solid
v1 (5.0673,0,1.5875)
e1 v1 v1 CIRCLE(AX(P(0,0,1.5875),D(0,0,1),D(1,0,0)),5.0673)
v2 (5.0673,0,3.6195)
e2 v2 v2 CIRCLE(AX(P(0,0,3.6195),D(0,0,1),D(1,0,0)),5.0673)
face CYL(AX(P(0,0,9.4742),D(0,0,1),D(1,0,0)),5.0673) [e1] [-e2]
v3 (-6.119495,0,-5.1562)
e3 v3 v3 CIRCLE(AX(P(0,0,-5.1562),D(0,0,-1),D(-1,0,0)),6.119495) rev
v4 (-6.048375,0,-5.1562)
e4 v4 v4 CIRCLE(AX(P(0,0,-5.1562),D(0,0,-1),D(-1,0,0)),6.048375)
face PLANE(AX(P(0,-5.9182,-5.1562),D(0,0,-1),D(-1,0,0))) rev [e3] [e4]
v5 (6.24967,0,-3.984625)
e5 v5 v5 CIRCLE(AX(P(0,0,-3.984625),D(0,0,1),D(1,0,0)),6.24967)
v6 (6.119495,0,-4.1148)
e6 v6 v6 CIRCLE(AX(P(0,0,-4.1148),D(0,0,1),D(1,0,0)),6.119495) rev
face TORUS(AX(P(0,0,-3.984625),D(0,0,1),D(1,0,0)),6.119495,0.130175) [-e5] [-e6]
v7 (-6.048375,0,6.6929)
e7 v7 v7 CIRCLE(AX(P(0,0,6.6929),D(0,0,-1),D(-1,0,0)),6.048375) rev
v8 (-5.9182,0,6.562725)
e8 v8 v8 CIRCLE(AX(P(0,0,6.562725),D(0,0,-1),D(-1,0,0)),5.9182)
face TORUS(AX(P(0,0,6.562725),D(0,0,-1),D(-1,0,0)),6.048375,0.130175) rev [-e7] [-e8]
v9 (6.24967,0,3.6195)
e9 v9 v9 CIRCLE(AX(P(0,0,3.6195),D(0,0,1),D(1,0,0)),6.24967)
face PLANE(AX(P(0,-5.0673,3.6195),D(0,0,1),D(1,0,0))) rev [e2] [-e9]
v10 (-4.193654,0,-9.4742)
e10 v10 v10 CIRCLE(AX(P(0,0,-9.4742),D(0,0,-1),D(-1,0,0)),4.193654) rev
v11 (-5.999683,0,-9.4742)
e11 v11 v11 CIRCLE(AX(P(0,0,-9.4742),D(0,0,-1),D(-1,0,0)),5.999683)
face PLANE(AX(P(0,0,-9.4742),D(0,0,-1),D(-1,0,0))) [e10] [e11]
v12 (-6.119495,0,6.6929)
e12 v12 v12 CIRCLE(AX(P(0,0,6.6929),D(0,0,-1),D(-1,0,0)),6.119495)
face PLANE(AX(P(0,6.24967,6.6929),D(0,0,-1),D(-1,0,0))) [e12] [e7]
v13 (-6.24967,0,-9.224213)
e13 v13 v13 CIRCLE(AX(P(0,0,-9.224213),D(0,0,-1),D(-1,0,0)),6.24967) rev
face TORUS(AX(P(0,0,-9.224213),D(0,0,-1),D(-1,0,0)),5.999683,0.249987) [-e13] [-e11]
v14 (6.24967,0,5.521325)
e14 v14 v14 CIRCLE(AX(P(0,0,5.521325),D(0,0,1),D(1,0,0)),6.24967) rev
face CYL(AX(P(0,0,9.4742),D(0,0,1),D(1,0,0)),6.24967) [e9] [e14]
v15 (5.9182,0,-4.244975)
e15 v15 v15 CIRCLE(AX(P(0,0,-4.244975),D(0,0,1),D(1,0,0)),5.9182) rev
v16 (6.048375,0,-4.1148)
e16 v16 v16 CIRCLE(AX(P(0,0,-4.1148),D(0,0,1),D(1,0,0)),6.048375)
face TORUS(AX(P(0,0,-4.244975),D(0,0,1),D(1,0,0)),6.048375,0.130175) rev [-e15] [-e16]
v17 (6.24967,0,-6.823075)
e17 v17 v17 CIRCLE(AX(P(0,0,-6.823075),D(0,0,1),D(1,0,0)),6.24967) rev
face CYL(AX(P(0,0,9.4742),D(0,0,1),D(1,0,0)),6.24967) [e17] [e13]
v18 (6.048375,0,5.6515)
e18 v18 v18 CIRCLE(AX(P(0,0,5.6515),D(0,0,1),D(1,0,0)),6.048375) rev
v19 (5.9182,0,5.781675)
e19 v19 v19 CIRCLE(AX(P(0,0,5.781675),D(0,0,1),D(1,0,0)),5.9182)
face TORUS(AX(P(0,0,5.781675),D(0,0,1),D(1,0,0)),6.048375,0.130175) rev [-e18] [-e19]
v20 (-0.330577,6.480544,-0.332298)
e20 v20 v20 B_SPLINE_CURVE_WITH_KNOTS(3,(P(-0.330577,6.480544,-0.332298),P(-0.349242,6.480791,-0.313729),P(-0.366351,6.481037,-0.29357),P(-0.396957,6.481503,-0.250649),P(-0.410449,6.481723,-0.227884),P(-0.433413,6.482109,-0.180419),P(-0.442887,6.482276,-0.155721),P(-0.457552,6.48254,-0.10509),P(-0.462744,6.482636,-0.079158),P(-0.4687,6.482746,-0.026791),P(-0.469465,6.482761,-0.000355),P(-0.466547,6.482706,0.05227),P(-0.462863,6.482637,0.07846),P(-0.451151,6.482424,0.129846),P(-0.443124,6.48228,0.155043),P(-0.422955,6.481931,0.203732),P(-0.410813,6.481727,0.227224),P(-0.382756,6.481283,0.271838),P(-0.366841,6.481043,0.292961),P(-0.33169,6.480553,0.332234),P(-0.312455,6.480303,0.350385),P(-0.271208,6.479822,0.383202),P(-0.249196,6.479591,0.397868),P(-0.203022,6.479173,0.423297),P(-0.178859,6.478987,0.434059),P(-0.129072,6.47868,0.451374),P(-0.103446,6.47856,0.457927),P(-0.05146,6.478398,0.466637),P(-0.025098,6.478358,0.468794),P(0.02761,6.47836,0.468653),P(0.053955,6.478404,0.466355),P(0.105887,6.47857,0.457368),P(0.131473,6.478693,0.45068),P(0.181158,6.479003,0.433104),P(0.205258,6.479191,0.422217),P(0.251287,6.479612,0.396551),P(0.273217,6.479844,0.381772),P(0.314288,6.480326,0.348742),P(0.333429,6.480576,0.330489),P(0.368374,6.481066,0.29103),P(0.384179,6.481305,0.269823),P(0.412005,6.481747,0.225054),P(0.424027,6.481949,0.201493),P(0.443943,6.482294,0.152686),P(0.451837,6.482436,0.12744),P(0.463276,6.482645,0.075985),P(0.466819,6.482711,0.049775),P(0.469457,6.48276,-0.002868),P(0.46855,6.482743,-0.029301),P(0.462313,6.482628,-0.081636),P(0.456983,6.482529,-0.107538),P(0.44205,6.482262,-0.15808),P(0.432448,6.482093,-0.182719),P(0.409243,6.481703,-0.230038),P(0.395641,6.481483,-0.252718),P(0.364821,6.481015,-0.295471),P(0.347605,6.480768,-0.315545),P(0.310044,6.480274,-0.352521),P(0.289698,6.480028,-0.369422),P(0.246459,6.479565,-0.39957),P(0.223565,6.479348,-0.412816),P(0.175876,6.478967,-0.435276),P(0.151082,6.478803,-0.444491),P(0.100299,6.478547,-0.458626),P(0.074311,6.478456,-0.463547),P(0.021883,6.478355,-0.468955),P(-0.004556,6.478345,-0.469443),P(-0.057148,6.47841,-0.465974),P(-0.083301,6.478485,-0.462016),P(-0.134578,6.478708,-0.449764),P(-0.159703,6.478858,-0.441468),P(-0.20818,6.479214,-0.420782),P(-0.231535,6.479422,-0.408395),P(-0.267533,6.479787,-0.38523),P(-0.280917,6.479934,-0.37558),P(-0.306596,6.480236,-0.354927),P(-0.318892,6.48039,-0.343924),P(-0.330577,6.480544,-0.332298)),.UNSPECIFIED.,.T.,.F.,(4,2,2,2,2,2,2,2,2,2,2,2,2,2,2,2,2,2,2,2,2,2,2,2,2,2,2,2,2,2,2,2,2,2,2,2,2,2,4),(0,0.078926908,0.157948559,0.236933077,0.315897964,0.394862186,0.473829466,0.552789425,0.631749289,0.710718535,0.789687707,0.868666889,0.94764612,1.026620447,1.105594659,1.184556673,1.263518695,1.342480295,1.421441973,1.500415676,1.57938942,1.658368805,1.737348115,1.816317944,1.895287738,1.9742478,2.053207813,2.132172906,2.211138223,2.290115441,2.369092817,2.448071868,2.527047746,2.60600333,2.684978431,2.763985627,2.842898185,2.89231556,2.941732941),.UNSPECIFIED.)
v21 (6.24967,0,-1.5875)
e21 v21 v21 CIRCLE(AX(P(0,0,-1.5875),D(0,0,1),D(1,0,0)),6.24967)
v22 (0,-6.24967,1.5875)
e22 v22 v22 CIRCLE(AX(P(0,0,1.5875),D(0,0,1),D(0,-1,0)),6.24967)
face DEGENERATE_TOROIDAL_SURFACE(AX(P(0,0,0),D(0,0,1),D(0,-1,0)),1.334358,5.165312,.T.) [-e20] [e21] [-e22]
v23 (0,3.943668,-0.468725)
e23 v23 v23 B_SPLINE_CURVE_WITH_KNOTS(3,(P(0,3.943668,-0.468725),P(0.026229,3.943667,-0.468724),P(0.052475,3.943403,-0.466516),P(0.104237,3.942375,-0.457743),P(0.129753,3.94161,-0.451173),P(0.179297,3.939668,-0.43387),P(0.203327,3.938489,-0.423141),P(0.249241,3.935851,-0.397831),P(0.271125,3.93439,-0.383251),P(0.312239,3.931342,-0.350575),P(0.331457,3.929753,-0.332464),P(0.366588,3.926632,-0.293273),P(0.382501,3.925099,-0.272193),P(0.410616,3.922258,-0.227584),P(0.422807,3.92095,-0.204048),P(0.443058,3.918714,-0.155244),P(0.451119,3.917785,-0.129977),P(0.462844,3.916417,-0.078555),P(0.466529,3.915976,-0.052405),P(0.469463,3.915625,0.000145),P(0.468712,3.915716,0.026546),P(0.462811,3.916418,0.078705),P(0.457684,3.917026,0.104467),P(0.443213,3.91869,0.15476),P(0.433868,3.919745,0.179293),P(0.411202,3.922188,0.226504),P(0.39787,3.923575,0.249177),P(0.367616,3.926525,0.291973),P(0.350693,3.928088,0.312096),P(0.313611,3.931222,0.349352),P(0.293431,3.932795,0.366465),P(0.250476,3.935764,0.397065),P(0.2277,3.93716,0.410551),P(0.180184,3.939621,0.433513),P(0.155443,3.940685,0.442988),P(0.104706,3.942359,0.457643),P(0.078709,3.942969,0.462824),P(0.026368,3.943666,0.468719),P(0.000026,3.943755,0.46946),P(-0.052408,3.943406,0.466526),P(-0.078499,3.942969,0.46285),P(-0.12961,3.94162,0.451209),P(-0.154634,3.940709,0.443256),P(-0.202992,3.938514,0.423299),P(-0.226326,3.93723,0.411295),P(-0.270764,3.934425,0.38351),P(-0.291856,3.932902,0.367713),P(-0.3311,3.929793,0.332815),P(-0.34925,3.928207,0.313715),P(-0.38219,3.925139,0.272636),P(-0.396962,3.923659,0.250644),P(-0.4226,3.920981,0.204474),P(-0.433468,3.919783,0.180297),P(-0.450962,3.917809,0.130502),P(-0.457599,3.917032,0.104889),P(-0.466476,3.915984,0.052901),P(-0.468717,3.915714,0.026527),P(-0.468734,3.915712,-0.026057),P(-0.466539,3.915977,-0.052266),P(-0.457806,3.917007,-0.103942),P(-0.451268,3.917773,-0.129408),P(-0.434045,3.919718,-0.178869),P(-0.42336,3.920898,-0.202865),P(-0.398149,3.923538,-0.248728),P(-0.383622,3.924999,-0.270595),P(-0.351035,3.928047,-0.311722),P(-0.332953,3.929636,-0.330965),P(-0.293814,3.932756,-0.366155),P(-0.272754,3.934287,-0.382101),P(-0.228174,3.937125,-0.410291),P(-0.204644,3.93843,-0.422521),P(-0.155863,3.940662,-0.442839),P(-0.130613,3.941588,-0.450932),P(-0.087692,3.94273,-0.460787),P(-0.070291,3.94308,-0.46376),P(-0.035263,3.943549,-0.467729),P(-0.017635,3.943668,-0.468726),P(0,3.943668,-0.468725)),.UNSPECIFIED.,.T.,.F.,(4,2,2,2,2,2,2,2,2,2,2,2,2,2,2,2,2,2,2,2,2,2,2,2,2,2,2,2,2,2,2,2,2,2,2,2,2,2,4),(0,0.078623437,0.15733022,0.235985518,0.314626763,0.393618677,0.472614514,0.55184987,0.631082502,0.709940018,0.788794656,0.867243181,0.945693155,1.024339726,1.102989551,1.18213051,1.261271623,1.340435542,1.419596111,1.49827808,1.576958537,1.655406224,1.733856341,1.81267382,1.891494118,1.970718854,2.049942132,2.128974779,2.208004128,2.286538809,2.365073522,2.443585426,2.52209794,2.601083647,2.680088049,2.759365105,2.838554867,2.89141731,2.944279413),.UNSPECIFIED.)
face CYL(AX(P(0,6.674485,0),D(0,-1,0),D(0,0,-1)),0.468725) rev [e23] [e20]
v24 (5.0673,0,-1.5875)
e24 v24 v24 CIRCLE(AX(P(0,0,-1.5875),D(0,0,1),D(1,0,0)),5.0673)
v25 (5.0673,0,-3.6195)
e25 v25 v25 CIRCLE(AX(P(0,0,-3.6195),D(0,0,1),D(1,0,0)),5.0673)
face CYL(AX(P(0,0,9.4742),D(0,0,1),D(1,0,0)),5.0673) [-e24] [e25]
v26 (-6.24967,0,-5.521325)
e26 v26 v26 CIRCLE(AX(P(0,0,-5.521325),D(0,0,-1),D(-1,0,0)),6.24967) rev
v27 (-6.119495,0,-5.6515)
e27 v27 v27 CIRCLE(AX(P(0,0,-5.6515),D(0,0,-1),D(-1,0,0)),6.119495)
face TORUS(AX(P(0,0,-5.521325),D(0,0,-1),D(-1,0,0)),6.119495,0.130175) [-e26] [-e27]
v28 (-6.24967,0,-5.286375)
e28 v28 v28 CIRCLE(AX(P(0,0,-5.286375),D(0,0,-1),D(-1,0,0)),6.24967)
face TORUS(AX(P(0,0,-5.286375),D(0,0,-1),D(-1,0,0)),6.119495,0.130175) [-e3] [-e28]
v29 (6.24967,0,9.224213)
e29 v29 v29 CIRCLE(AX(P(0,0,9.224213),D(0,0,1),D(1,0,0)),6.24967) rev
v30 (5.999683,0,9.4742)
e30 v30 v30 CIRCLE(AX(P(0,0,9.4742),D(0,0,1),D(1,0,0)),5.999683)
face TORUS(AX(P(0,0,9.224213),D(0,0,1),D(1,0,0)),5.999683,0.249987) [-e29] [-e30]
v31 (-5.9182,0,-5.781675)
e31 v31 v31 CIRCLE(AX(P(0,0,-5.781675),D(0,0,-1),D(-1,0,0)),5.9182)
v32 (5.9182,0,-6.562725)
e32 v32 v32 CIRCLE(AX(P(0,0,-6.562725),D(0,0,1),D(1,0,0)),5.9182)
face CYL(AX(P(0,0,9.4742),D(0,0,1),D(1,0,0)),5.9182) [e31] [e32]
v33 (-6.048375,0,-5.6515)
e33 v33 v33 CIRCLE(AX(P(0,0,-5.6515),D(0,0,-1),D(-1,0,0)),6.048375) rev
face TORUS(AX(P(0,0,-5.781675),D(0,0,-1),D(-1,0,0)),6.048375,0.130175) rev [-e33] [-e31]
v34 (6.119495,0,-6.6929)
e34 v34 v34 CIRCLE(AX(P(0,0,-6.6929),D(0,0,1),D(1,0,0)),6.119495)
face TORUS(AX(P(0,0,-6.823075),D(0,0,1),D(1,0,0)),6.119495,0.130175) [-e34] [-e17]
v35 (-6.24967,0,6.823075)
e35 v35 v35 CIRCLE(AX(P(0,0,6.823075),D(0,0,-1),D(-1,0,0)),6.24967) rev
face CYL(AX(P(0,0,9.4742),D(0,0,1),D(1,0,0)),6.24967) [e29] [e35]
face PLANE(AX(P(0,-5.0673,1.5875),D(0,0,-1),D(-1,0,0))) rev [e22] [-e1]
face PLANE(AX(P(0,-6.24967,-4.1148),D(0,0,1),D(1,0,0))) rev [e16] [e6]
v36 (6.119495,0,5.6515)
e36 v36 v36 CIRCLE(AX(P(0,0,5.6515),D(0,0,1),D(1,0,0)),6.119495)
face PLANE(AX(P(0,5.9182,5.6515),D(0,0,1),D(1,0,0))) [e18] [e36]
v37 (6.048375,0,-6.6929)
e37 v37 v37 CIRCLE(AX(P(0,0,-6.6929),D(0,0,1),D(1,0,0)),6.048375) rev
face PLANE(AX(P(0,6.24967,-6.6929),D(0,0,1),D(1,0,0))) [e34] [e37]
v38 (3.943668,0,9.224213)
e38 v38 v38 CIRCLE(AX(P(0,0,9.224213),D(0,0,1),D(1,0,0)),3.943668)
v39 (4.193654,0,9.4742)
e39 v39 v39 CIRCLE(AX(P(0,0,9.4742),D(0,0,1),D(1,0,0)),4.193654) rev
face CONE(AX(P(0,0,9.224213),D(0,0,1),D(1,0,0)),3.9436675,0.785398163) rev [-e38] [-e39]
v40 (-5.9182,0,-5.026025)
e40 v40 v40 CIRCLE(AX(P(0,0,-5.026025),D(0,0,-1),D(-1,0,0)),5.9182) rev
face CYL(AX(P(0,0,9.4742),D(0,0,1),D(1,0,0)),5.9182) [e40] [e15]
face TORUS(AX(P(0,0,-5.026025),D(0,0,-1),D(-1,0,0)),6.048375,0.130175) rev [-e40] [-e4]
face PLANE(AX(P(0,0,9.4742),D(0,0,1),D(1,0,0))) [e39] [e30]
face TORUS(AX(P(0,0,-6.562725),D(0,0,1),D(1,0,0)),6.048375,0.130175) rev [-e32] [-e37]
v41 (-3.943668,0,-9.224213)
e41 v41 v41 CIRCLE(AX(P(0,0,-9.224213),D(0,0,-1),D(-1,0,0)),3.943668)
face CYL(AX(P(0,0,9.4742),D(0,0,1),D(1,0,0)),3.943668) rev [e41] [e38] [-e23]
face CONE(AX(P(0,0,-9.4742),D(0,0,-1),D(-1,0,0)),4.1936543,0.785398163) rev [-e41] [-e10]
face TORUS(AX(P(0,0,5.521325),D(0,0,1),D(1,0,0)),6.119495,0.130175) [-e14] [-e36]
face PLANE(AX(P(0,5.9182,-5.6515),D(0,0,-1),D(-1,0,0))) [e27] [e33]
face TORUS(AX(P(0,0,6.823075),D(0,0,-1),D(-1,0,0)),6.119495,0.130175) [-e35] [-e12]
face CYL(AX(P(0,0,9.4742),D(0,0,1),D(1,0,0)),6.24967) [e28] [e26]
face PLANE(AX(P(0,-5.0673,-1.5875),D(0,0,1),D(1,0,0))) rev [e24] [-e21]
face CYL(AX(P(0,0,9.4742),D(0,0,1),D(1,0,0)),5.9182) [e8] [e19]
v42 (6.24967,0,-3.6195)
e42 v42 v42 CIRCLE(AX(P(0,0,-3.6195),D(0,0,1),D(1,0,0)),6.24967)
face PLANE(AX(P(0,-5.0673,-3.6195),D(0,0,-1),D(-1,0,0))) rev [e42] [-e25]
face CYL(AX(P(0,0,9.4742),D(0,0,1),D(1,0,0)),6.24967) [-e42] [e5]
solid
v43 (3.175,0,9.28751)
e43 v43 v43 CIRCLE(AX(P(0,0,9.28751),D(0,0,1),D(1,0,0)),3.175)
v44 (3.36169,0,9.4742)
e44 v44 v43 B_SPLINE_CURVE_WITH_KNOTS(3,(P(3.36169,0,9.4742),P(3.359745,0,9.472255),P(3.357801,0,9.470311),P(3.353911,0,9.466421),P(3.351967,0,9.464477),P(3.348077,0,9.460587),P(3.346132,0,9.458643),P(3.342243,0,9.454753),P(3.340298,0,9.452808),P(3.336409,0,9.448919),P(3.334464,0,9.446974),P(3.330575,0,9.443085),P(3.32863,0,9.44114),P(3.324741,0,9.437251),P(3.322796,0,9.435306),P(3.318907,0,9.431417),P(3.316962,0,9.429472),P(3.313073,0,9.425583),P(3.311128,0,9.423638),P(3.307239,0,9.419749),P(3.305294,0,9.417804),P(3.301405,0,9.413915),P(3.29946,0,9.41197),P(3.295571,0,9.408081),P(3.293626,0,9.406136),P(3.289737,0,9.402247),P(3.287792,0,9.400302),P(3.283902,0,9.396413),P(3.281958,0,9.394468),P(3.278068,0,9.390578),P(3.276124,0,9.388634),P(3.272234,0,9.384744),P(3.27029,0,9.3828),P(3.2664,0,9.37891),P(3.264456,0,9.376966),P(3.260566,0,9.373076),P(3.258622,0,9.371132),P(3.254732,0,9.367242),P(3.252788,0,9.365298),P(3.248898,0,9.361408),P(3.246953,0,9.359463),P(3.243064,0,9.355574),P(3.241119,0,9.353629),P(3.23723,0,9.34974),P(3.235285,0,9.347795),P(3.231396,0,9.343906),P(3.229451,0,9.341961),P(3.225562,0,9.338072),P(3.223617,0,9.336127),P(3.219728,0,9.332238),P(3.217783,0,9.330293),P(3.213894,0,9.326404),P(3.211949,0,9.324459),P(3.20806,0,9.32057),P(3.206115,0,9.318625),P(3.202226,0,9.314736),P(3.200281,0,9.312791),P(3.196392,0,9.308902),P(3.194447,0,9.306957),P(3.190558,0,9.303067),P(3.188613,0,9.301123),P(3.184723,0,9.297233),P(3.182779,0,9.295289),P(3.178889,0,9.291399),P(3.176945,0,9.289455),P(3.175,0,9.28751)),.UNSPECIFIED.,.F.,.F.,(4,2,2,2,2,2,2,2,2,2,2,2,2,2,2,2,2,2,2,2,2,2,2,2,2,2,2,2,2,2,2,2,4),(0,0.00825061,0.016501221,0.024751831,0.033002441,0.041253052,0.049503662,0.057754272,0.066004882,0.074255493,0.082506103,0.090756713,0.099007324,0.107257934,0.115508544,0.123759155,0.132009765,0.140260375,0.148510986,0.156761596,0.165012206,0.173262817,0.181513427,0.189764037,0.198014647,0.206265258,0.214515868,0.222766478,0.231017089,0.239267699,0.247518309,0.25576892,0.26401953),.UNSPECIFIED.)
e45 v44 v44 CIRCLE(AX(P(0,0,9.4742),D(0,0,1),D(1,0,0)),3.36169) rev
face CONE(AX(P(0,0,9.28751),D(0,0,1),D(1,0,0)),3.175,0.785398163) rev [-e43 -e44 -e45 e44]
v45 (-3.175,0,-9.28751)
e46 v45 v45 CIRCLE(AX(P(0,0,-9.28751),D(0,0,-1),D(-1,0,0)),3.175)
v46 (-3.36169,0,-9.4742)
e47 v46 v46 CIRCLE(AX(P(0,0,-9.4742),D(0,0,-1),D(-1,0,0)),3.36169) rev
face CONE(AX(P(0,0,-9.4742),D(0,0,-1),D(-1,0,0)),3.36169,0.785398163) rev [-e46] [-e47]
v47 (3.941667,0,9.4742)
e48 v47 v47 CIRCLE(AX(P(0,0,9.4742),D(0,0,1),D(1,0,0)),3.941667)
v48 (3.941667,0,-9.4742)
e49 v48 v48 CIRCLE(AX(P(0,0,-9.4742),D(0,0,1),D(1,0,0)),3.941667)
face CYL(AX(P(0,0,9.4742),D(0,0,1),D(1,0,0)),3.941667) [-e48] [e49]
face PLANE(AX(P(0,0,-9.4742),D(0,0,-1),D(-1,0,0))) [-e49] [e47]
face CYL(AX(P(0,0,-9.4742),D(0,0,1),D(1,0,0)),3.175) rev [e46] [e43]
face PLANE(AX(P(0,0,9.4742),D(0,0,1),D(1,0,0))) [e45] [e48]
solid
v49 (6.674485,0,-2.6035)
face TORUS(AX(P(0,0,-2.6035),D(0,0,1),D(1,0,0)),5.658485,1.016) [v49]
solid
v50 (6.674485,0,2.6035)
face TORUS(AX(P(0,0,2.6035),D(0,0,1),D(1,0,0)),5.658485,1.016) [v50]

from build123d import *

# Parameters (mm, degrees)
BORE_DEPTH                      = 13.95674403
BORE_DEPTH_BACK                 = 13.95674403
SKETCH16_R                      = 3.175
CUT_REVOLVE_THIN1_START         = -9.4742
CUT_REVOLVE_THIN1_OUTLINE_R     = 3.9436675
CUT_REVOLVE_THIN1_OUTLINE_R_2   = 3.175
CUT_REVOLVE_THIN1_DEPTH         = 18.9484
CUT_REVOLVE_THIN1_2_OUTLINE_R   = 3.9416675
CUT_REVOLVE_THIN1_2_OUTLINE_R_2 = 3.175
CUT_REVOLVE_THIN1_2_DEPTH       = 18.9484
SKETCH11_W                      = 2.032
SKETCH11_H                      = 1.18237
SKETCH17_W                      = 1.0414
SKETCH17_H                      = 0.33147
SKETCH14_R                      = 1.016
SKETCH12_R                      = 0.46872525
CUT_EXTRUDE3_DEPTH              = 14.373779135
FILLET1_R                       = 0.2499868
FILLET2_R                       = 0.130175
CHAMFER1_SIZE                   = 0.2499868
CHAMFER2_SIZE                   = 0.18669


with BuildPart() as part:
    # Sketch15 → Bearing (revolve)
    with BuildSketch(Plane(origin=(0, 0, 0), x_dir=(0, 0, -1), z_dir=(1, 0, 0)), mode=Mode.PRIVATE) as bearing_sk:
        Polygon((-9.4742, 0), (9.4742, 0), (9.4742, -6.24967), (6.6929, -6.24967), (6.6929, -5.9182), (5.6515, -5.9182), (5.6515, -6.24967), (-5.6515, -6.24967), (-5.6515, -5.9182), (-6.6929, -5.9182), (-6.6929, -6.24967), (-9.4742, -6.24967), align=None)
    revolve(bearing_sk.sketch.rotate(Axis((0, 0, 9.4742), (0, 0, -1)), 270), axis=Axis((0, 0, 9.4742), (0, 0, -1)))

    # Sketch16 → Bore (cut, two sides: drawn at the far end of the back side and taken through both)
    with BuildSketch(Plane.XY.offset(-BORE_DEPTH_BACK)):
        Circle(SKETCH16_R)
    extrude(amount=BORE_DEPTH + BORE_DEPTH_BACK, mode=Mode.SUBTRACT)

    # Cut-Revolve-Thin1: read off the stored shape, not the designer's step
    # Cut-Revolve-Thin1 outline → Cut-Revolve-Thin1 (cut)
    with BuildSketch(Plane.XY.offset(CUT_REVOLVE_THIN1_START)):
        Circle(CUT_REVOLVE_THIN1_OUTLINE_R)
        Circle(CUT_REVOLVE_THIN1_OUTLINE_R_2, mode=Mode.SUBTRACT)
    extrude(amount=CUT_REVOLVE_THIN1_DEPTH, mode=Mode.SUBTRACT)

    # Sketch11 → Cut-Revolve1 (revolve, cut)
    with BuildSketch(Plane(origin=(0, 0, 0), x_dir=(0, 0, -1), z_dir=(1, 0, 0)), mode=Mode.PRIVATE) as cut_revolve1_sk:
        with Locations((-2.6035, -5.658485)):
            Rectangle(SKETCH11_W, SKETCH11_H)
        with Locations((2.6035, -5.658485)):
            Rectangle(SKETCH11_W, SKETCH11_H)
    revolve(cut_revolve1_sk.sketch.rotate(Axis((0, 0, 9.4742), (0, 0, -1)), 270), axis=Axis((0, 0, 9.4742), (0, 0, -1)), mode=Mode.SUBTRACT)

    # Sketch17 → Cut-Revolve2 (revolve, cut)
    with BuildSketch(Plane(origin=(0, 0, 0), x_dir=(0, 0, -1), z_dir=(1, 0, 0)), mode=Mode.PRIVATE) as cut_revolve2_sk:
        with Locations((4.6355, -6.083935)):
            Rectangle(SKETCH17_W, SKETCH17_H)
    revolve(cut_revolve2_sk.sketch.rotate(Axis((0, 0, 9.4742), (0, 0, -1)), 270), axis=Axis((0, 0, 9.4742), (0, 0, -1)), mode=Mode.SUBTRACT)

    # Sketch13 → Revolve5 (revolve)
    with BuildSketch(Plane(origin=(0, 0, 0), x_dir=(0, 0, -1), z_dir=(1, 0, 0)), mode=Mode.PRIVATE) as revolve5_sk:
        with BuildLine():
            Line((-1.5875, 6.24967), (1.5875, 6.24967))
            ThreePointArc((1.5875, 6.24967), (0, 6.49967), (-1.5875, 6.24967))
        make_face()
    revolve(revolve5_sk.sketch.rotate(Axis((0, 0, 9.4742), (0, 0, -1)), 180), axis=Axis((0, 0, 9.4742), (0, 0, -1)))

    # Sketch12 → Cut-Extrude3 (cut, through all)
    with BuildSketch(Plane(origin=(0, 0, 0), x_dir=(1, 0, 0), z_dir=(0, 1, 0))):
        with Locations(Location((0, 0, 0), (0, 0, 90))):
            Circle(SKETCH12_R)
    extrude(amount=CUT_EXTRUDE3_DEPTH, mode=Mode.SUBTRACT)

    # Fillet1
    fillet1_edges = [part.edges().sort_by_distance(p)[0] for p in [
        (-6.24967, 0, -9.4742),
        (-6.24967, 0, 9.4742),
    ]]
    fillet(fillet1_edges, radius=FILLET1_R)

    # Fillet2
    fillet2_edges = [part.edges().sort_by_distance(p)[0] for p in [
        (-6.24967, 0, 6.6929),
        (-5.9182, 0, 6.6929),
        (-5.9182, 0, 5.6515),
        (-6.24967, 0, 5.6515),
        (-6.24967, 0, -5.6515),
        (-5.9182, 0, -5.6515),
        (-5.9182, 0, -6.6929),
        (-6.24967, 0, -6.6929),
        (-5.9182, 0, -5.1562),
        (-6.24967, 0, -5.1562),
        (-6.24967, 0, -4.1148),
        (-5.9182, 0, -4.1148),
    ]]
    fillet(fillet2_edges, radius=FILLET2_R)

    # Chamfer1
    chamfer1_edges = [part.edges().sort_by_distance(p)[0] for p in [
        (-3.9436675, 0, -9.4742),
        (-3.9436675, 0, 9.4742),
    ]]
    chamfer(chamfer1_edges, length=CHAMFER1_SIZE)


with BuildPart() as body_2:
    # Cut-Revolve-Thin1 2 outline → Cut-Revolve-Thin1 2 (new body)
    with BuildSketch(Plane.XY.offset(CUT_REVOLVE_THIN1_START)):
        Circle(CUT_REVOLVE_THIN1_2_OUTLINE_R)
        Circle(CUT_REVOLVE_THIN1_2_OUTLINE_R_2, mode=Mode.SUBTRACT)
    extrude(amount=CUT_REVOLVE_THIN1_2_DEPTH)

    # Chamfer2
    chamfer2_edges = [body_2.edges().sort_by_distance(p)[0] for p in [
        (-3.175, 0, -9.4742),
        (-3.175, 0, 9.4742),
    ]]
    chamfer(chamfer2_edges, length=CHAMFER2_SIZE)


with BuildPart() as body_3:
    # Sketch14 → Revolve8 (revolve)
    with BuildSketch(Plane(origin=(0, 0, 0), x_dir=(0, 0, -1), z_dir=(1, 0, 0)), mode=Mode.PRIVATE) as revolve8_sk:
        with Locations((-2.6035, 5.658485)):
            Circle(SKETCH14_R)
        with Locations((2.6035, 5.658485)):
            Circle(SKETCH14_R)
    revolve(revolve8_sk.sketch.rotate(Axis((0, 0, 9.4742), (0, 0, -1)), 180), axis=Axis((0, 0, 9.4742), (0, 0, -1)))


solid = Compound([part.part, body_2.part, body_3.part])
